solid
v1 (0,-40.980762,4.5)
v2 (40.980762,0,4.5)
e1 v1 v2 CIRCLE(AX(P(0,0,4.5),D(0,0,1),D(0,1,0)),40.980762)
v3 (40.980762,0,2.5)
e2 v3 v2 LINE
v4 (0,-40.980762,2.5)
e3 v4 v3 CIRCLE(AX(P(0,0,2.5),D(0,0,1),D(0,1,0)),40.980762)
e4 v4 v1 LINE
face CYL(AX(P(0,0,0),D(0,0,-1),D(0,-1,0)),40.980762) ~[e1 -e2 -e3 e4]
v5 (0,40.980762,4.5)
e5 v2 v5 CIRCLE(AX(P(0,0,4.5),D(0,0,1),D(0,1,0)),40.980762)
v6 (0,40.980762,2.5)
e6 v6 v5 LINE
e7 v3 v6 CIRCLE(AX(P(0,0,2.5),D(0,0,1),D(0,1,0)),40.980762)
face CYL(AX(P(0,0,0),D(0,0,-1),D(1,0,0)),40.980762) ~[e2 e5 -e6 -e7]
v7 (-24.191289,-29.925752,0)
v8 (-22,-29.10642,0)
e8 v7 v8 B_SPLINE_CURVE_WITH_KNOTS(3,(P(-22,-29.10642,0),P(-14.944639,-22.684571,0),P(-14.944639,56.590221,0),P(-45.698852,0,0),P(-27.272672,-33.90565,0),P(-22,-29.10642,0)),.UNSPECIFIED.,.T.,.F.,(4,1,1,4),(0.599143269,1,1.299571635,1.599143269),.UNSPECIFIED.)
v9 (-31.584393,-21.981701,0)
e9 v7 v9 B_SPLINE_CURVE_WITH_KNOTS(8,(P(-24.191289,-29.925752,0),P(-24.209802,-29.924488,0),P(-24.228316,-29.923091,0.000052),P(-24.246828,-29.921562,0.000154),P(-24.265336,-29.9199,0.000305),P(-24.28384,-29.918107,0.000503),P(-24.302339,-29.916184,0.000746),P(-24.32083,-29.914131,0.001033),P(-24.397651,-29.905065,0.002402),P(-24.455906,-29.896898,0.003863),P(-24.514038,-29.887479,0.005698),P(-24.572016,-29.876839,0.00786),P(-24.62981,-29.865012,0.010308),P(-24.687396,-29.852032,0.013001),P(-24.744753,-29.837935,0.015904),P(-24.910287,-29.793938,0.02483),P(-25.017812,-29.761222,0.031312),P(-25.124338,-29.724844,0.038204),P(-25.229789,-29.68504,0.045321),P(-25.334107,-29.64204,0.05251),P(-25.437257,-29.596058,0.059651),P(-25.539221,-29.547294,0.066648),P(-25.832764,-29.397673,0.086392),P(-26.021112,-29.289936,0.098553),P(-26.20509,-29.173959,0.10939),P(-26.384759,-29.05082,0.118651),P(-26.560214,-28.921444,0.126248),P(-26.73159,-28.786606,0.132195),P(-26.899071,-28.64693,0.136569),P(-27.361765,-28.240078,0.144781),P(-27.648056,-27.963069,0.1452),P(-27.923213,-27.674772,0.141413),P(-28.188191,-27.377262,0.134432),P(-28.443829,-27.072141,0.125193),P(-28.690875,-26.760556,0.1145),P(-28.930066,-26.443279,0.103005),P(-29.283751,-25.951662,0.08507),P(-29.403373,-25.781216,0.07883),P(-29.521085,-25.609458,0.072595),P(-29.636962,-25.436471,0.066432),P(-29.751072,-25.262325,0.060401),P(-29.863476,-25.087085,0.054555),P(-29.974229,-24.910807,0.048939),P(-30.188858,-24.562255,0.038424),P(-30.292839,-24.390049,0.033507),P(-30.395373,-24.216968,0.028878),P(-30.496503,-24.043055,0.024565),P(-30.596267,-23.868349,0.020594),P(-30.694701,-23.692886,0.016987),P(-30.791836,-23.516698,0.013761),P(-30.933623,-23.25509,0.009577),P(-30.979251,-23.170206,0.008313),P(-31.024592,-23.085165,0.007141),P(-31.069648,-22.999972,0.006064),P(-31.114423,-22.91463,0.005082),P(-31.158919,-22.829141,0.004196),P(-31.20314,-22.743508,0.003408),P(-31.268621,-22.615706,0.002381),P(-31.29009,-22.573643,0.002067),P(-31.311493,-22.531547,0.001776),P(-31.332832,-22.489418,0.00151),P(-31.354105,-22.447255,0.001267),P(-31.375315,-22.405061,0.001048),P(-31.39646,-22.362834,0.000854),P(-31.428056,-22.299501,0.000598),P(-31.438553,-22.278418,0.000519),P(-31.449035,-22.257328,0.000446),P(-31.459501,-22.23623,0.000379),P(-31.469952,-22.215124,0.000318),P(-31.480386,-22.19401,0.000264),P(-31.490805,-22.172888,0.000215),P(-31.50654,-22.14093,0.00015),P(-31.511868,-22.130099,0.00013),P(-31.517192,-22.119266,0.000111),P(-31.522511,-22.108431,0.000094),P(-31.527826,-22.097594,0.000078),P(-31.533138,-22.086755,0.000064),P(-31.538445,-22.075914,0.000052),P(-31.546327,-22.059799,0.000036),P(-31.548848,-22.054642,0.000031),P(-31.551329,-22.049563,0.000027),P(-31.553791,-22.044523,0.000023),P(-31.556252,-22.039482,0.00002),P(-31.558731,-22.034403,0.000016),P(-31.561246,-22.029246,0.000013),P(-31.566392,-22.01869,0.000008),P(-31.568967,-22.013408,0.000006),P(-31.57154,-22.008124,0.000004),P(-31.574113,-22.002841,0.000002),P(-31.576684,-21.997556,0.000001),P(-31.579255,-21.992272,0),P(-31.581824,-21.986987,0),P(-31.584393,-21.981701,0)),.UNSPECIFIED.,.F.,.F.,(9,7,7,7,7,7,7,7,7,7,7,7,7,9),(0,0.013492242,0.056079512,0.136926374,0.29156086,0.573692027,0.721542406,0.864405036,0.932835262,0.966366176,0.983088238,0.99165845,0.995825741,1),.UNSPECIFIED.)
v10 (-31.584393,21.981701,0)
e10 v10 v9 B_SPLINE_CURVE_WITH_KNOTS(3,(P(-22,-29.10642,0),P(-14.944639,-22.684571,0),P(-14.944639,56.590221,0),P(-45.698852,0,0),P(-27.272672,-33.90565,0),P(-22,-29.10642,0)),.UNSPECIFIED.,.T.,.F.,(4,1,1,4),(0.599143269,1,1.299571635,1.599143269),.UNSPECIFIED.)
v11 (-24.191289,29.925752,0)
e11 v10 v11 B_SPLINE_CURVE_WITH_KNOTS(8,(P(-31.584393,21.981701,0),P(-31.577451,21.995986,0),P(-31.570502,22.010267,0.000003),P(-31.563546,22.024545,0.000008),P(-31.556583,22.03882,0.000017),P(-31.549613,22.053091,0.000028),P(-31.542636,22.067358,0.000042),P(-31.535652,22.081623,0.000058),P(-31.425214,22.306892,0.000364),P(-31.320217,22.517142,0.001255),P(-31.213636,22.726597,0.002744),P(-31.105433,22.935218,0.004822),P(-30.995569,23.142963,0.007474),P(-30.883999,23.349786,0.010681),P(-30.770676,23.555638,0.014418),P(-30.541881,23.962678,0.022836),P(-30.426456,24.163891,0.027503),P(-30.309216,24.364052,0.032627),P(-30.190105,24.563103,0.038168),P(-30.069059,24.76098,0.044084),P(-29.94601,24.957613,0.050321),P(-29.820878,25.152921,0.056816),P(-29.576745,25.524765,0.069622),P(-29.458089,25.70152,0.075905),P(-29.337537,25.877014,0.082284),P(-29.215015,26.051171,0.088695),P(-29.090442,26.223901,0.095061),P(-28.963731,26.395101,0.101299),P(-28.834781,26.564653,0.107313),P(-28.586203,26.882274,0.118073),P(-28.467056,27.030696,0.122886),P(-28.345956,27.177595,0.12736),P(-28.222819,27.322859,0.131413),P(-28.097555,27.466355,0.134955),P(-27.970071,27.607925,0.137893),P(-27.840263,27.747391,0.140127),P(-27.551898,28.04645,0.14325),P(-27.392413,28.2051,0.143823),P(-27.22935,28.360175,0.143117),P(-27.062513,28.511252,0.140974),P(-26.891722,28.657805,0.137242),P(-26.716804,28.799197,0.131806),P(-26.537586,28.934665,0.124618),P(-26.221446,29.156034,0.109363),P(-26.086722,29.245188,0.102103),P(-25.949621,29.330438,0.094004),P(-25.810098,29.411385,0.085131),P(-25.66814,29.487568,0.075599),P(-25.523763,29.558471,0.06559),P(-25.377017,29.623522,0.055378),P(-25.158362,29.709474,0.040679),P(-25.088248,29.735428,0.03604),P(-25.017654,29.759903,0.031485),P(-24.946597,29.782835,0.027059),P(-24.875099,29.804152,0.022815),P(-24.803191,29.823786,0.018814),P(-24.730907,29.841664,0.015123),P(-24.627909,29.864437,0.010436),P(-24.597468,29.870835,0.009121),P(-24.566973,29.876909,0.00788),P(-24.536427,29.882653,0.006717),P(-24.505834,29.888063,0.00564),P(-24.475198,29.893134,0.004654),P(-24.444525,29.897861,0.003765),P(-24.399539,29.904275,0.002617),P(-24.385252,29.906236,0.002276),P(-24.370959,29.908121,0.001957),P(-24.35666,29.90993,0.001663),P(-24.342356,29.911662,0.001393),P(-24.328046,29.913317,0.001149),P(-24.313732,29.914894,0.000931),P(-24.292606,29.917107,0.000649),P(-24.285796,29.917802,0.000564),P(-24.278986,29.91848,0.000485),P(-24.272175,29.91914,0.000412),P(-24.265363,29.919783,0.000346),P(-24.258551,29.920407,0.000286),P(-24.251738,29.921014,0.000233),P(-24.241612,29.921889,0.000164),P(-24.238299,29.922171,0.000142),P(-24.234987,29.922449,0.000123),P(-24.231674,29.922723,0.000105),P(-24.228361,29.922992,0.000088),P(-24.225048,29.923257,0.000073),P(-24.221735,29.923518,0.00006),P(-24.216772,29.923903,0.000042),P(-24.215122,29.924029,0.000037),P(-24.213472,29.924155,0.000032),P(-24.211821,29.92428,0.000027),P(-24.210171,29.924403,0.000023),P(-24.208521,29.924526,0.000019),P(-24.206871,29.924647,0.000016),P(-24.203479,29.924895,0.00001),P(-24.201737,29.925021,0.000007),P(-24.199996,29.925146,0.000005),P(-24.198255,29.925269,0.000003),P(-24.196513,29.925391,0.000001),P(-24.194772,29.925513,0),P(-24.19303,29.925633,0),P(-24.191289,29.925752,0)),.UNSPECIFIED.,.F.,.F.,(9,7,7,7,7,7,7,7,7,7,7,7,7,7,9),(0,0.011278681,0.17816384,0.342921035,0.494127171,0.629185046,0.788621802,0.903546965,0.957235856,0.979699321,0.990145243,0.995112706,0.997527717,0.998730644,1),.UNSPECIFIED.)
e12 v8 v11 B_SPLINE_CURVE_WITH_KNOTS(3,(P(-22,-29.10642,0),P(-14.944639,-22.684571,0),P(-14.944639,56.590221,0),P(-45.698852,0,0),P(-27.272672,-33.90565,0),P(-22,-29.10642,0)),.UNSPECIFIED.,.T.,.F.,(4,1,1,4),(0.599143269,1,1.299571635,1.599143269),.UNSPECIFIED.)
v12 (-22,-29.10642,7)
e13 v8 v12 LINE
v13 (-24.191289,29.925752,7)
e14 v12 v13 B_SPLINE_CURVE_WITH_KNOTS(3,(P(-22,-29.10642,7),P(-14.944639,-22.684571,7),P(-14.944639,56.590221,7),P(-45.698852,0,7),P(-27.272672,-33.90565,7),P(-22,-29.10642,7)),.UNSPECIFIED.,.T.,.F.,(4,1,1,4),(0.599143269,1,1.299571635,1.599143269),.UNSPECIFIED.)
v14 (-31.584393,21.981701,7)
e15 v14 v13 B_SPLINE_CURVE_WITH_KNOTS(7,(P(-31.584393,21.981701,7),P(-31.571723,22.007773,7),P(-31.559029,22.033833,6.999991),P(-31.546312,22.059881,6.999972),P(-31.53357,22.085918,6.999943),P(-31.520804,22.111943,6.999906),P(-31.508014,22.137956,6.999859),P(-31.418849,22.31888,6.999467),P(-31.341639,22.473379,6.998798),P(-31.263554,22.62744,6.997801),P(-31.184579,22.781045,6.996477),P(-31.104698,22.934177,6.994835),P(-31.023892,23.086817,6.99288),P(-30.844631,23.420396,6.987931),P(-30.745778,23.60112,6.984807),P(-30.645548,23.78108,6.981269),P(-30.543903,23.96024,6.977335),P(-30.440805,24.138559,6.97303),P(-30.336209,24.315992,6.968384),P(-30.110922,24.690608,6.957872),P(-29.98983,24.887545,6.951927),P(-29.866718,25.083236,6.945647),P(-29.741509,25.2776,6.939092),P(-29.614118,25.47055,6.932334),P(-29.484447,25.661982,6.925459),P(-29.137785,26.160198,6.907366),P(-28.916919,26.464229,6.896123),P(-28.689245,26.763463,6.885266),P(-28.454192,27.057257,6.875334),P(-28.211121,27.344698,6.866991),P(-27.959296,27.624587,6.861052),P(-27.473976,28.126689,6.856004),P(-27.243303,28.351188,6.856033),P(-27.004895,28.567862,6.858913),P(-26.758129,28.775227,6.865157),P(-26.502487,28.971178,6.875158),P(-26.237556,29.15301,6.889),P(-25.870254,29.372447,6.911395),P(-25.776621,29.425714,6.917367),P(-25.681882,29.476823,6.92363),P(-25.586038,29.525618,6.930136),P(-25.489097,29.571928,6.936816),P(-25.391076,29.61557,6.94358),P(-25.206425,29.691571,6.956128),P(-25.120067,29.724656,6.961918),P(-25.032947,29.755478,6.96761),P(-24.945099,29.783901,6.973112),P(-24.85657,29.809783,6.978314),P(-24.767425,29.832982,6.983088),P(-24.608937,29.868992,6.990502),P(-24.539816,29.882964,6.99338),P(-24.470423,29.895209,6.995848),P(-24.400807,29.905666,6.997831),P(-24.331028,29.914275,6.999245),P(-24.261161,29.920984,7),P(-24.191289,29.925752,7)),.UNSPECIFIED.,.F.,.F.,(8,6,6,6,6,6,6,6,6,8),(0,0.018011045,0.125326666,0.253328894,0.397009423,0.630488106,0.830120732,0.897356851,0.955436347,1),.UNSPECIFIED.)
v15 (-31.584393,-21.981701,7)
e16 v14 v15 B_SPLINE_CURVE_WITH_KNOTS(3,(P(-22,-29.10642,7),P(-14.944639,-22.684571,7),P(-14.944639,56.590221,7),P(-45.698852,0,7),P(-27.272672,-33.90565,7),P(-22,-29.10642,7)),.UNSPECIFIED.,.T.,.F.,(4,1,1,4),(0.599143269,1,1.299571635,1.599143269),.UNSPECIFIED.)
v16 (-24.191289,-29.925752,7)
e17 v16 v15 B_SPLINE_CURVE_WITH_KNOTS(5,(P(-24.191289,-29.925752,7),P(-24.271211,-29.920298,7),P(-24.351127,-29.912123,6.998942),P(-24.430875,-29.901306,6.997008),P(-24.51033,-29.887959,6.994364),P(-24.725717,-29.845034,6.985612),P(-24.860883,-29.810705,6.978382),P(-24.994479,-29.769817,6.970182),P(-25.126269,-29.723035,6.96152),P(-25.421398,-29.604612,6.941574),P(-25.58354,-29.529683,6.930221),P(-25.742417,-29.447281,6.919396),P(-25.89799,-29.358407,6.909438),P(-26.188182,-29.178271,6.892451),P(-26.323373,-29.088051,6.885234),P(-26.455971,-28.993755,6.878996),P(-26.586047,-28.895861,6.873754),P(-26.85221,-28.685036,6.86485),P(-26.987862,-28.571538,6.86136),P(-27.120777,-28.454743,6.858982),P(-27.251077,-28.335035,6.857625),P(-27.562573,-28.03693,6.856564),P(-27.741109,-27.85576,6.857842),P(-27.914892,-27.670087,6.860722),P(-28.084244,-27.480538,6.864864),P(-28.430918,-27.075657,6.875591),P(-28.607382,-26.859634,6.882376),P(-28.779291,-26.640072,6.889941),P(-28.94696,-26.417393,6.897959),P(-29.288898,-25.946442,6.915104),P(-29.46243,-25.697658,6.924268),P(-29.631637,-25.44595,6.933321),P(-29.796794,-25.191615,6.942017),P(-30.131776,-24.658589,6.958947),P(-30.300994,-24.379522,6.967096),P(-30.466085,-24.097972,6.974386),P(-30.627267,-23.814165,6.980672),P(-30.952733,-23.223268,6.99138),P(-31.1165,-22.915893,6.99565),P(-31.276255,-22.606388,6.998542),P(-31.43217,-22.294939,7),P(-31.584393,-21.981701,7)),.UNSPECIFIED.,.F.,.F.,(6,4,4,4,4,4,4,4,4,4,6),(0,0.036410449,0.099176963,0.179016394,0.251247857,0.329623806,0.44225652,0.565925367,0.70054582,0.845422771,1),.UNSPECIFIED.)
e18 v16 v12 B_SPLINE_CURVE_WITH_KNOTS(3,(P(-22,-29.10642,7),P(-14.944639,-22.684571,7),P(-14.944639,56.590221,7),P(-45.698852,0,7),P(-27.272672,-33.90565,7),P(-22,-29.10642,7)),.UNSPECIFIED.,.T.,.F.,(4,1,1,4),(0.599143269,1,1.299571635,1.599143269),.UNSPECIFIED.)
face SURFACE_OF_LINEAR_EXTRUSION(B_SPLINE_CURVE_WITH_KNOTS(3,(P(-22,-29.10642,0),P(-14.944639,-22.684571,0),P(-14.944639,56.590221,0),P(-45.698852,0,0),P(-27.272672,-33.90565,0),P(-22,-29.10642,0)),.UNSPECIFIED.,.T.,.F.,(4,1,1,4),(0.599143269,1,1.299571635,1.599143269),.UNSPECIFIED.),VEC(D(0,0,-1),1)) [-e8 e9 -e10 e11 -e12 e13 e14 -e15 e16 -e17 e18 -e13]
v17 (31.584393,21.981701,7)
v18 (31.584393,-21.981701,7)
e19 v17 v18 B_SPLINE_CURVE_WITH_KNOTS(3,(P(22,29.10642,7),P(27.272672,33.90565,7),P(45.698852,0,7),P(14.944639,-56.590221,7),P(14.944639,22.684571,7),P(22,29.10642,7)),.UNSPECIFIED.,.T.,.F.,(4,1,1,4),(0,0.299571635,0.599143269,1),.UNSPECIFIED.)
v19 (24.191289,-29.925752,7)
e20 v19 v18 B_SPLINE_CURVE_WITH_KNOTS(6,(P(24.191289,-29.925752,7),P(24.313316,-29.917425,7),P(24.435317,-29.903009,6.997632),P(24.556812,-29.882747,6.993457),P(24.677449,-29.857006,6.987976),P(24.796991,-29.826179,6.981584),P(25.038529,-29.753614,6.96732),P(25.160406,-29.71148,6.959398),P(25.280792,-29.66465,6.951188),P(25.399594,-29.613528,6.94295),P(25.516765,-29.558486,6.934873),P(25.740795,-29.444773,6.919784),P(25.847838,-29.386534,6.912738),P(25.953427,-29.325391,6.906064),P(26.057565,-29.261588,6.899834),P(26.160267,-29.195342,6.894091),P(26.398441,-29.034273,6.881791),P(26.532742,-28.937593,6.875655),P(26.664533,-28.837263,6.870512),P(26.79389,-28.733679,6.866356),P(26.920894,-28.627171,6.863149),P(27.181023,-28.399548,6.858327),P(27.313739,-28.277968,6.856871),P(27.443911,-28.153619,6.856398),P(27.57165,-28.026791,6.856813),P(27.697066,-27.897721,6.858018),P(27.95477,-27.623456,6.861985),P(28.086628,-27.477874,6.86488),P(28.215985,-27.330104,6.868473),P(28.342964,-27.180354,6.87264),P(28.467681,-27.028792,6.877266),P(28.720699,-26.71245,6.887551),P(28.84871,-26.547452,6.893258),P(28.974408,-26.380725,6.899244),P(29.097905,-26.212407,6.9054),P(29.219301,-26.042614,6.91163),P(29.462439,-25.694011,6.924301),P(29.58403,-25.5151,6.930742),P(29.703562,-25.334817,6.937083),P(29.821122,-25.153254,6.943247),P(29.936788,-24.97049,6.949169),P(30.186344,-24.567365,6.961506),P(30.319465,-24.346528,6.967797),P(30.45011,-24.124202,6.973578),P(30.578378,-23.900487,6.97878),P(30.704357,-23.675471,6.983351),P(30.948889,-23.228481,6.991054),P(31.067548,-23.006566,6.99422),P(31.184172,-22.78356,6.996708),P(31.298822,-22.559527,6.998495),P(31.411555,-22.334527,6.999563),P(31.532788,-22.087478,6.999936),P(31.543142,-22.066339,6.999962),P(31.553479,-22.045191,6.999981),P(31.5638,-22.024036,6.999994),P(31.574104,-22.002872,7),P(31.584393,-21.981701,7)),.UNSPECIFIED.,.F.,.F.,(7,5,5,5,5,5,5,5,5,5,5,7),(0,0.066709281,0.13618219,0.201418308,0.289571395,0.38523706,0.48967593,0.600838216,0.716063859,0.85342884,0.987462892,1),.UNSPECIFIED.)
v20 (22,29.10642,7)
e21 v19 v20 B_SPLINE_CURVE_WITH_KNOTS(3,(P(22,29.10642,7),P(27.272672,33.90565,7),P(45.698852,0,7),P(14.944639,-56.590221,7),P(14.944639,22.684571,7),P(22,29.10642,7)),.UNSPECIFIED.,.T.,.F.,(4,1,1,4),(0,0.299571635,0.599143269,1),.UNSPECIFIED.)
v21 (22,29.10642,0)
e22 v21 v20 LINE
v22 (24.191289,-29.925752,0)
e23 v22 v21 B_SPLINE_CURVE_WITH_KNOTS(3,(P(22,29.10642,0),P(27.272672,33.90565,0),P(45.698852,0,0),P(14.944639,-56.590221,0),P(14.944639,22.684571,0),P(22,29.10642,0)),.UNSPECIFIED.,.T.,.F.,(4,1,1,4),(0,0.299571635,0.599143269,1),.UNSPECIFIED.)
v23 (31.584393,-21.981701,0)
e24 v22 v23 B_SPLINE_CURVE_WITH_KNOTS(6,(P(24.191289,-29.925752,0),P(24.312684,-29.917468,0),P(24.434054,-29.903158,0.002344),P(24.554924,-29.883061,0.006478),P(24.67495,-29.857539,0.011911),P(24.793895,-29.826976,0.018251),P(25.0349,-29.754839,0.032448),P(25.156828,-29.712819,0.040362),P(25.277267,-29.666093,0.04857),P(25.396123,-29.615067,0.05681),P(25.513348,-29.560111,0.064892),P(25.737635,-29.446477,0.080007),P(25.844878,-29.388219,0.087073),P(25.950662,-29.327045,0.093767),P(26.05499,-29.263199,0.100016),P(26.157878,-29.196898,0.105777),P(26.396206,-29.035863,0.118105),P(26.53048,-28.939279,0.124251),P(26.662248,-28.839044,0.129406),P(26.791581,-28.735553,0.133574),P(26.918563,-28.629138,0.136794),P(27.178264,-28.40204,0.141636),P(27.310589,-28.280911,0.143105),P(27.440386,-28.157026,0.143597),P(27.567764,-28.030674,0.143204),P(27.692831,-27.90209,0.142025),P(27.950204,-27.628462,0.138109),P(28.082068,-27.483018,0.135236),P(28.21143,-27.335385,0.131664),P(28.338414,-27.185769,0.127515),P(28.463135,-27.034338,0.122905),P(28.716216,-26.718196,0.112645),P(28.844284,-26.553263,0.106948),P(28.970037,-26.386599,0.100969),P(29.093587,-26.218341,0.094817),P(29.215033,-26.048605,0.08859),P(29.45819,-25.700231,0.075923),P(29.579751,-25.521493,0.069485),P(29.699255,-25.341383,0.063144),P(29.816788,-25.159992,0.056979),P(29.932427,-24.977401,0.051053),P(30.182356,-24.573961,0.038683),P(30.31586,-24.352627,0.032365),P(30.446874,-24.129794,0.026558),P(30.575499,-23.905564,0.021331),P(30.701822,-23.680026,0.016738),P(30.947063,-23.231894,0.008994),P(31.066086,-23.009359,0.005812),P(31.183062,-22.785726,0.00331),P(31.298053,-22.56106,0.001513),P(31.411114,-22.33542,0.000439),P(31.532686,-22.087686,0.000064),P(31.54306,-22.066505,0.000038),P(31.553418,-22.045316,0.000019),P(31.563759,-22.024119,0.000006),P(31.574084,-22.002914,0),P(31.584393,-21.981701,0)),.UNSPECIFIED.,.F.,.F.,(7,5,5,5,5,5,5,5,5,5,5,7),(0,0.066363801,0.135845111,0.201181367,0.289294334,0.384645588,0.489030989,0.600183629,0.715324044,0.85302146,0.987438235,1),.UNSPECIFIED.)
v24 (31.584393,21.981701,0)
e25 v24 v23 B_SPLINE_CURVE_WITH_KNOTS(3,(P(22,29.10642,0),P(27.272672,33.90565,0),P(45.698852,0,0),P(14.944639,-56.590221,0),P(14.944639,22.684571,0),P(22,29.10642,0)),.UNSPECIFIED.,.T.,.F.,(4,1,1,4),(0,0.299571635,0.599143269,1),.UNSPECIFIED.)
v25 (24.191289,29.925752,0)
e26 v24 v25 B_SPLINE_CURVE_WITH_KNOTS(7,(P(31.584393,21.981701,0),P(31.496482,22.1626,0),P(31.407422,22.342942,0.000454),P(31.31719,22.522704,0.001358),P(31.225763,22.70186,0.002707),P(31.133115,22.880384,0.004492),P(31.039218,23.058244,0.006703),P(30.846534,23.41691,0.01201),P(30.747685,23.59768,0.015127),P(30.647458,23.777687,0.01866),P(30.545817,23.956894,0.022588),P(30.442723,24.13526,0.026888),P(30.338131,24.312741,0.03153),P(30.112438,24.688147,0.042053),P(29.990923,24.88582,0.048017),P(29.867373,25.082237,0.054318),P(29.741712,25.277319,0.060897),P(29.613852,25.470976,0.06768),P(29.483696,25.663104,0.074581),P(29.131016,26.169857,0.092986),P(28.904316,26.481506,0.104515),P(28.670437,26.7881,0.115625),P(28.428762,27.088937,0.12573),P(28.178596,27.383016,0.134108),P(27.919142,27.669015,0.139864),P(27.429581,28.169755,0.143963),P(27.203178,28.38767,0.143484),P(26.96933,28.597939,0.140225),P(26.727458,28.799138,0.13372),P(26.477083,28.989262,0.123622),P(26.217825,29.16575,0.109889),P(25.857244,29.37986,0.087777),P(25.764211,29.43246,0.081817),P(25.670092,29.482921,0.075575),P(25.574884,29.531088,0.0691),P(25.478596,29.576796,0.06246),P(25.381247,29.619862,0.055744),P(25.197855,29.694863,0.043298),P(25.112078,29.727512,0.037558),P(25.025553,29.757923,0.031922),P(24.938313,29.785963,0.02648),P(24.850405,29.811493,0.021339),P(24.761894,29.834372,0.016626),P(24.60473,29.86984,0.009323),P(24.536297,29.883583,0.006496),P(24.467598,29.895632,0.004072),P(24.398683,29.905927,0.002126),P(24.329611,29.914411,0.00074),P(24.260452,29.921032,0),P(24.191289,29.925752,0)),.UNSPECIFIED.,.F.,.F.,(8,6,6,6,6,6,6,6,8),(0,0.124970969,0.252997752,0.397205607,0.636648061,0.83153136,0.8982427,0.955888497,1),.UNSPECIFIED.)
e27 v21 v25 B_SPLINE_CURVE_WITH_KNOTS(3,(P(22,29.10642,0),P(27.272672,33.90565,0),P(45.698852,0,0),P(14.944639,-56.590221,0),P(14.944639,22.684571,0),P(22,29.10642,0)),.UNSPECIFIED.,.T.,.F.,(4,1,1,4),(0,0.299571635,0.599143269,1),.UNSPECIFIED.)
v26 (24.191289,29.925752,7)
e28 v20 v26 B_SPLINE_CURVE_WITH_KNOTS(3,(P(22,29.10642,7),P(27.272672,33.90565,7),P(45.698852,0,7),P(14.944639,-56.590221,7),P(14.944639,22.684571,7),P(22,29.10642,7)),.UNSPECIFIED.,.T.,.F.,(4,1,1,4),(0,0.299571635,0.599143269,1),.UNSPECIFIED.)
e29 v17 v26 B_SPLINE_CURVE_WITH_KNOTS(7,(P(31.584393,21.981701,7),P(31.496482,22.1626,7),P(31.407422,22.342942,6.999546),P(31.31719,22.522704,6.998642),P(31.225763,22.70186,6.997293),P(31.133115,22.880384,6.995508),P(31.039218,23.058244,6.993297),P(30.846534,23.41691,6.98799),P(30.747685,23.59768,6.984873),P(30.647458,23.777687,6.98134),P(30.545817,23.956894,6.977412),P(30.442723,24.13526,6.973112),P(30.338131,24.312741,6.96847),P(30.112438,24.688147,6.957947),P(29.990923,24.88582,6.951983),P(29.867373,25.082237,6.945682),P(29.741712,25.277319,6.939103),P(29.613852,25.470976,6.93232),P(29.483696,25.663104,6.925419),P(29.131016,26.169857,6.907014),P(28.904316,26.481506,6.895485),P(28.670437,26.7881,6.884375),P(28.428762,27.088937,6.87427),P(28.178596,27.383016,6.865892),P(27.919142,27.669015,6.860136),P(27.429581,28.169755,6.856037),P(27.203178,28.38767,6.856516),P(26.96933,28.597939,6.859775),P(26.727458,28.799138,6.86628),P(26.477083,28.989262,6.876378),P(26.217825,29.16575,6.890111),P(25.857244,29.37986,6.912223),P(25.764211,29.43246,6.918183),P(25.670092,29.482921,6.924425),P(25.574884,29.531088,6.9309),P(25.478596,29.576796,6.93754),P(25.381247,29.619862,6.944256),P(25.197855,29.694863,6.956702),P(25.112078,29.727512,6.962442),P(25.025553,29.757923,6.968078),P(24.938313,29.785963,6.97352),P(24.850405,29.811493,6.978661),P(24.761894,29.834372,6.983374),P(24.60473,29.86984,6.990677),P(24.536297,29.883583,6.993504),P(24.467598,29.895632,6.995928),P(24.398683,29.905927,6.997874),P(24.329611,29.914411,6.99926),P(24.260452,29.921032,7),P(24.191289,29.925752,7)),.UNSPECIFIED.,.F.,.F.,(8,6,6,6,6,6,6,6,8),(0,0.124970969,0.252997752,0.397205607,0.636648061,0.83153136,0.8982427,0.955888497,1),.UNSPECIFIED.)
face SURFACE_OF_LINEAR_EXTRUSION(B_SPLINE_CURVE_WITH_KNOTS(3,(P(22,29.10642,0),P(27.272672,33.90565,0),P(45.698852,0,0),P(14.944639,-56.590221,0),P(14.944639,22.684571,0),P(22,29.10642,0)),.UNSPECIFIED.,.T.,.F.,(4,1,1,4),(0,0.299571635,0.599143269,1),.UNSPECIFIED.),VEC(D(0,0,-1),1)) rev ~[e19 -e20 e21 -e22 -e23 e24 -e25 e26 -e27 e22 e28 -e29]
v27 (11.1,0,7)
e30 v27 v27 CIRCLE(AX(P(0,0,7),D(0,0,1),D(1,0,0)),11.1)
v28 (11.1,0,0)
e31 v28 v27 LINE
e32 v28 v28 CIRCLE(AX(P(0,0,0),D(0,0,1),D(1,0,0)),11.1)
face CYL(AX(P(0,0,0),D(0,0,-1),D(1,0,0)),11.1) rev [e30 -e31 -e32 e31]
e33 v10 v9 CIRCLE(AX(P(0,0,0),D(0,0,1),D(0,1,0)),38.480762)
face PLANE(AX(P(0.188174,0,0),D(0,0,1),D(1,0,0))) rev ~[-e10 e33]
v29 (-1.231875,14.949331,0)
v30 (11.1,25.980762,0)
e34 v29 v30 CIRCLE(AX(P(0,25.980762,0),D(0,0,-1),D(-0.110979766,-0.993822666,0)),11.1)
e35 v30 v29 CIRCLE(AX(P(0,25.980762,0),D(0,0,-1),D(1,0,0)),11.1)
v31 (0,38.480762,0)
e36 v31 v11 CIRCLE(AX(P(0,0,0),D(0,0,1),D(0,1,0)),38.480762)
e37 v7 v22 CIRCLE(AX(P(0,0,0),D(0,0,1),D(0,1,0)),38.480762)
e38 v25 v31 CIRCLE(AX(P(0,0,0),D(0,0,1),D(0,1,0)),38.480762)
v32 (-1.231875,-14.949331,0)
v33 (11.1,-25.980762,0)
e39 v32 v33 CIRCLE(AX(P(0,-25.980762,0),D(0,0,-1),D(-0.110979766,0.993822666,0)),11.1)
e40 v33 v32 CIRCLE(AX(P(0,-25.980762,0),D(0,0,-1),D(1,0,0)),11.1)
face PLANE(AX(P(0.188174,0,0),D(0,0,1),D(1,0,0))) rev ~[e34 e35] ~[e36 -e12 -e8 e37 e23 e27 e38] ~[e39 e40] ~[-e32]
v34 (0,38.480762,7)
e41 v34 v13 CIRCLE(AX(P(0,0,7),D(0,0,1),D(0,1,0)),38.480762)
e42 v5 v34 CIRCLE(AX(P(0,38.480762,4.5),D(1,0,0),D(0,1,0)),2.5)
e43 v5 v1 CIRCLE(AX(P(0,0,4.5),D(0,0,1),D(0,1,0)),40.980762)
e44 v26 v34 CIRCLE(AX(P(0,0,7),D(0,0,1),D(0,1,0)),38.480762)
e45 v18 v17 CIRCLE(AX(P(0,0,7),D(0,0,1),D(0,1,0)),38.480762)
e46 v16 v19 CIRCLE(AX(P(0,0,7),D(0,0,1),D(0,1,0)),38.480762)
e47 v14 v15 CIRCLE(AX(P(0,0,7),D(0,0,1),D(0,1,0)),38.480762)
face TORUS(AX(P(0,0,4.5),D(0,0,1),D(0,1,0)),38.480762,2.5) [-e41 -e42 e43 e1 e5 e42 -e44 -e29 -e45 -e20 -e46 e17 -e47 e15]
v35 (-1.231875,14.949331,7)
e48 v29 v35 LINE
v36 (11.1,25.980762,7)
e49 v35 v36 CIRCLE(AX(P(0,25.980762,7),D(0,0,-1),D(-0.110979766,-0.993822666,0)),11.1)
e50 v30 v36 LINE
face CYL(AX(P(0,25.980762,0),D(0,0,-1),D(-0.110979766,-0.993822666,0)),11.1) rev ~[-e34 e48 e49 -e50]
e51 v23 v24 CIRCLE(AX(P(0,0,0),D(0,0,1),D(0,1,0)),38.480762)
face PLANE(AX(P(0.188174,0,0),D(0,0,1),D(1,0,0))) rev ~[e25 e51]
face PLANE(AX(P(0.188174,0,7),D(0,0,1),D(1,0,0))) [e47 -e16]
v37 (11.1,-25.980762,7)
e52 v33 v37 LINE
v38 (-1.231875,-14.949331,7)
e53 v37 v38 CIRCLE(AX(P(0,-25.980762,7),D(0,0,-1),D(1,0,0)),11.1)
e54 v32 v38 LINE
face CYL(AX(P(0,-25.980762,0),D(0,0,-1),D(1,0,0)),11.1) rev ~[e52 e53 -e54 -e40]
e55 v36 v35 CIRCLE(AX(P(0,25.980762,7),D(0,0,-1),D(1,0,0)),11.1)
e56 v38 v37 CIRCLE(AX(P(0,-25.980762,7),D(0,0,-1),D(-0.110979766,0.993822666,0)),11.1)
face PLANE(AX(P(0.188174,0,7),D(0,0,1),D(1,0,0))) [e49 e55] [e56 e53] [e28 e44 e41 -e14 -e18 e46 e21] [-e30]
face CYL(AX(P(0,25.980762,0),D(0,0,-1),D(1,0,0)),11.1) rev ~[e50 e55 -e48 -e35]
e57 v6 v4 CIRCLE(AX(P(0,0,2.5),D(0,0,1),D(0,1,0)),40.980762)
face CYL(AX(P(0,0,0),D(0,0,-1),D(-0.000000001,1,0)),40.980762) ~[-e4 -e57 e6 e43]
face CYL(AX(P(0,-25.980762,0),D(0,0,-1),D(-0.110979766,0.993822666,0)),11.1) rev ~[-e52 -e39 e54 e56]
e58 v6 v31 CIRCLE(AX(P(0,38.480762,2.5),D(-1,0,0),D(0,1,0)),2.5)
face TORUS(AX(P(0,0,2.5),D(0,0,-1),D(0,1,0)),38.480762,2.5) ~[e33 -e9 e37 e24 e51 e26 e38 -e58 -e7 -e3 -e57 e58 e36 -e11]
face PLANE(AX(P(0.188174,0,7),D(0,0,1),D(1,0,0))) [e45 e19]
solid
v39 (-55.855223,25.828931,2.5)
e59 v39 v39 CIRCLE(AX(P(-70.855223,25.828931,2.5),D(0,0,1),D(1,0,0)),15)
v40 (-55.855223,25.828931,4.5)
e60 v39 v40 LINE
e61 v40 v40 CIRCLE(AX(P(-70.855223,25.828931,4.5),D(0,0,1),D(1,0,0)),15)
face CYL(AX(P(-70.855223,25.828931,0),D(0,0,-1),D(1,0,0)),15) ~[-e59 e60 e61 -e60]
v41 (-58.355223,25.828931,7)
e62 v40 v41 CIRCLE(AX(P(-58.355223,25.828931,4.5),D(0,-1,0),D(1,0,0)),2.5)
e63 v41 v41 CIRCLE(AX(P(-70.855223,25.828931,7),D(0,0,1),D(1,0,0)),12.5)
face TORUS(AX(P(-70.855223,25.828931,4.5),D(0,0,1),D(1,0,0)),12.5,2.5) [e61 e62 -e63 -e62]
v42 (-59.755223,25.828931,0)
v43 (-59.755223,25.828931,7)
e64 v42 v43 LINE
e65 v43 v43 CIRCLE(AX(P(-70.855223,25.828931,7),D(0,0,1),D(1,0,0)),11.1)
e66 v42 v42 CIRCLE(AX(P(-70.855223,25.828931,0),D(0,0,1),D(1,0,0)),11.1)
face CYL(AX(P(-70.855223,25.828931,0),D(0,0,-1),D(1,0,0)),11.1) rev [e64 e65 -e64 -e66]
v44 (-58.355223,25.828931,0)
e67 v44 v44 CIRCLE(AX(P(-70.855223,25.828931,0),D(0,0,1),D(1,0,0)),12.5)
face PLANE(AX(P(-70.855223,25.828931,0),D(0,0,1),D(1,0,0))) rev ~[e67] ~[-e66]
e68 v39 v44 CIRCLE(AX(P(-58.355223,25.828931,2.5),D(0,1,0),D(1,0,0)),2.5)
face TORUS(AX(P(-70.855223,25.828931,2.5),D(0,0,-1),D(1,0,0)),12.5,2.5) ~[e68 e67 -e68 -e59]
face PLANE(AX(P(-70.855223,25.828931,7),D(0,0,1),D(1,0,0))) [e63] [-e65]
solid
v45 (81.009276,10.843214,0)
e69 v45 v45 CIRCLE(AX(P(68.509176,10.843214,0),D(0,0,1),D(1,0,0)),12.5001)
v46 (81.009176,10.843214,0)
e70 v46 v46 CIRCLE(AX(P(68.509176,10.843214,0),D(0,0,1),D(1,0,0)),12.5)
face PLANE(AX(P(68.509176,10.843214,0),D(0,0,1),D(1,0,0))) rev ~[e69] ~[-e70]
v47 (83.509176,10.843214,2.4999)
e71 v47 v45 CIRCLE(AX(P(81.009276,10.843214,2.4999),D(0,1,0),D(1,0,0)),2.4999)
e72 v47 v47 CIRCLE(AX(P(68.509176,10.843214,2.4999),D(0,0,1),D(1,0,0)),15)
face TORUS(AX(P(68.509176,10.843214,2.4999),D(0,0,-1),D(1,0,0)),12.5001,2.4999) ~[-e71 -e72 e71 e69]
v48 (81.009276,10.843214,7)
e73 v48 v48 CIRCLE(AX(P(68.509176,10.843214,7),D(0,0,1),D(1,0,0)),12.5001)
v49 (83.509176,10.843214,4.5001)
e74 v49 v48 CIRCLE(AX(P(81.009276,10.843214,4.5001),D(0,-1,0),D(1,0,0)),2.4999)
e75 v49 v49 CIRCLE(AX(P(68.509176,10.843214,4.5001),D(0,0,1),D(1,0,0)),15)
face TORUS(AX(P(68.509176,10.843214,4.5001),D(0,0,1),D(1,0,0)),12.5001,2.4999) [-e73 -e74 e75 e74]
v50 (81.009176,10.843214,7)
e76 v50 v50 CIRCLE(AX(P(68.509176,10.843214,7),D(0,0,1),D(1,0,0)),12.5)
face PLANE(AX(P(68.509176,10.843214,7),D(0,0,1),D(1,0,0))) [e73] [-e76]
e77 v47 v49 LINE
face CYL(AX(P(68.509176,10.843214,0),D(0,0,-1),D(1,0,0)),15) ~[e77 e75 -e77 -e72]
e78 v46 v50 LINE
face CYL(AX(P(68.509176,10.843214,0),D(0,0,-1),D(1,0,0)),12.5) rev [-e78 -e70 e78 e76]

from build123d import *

# Parameters (mm, degrees)
F0_R      = 11.1
F1_DEPTH  = 7
F0_R_2    = 15
F0_R_3    = 12.5
F2_2_F1_R = 2.5
F2_2_F2_R = 2.5
F2_3_F1_R = 2.4999
F2_3_F2_R = 2.4999


# Not quite as in the source:
# - a fillet or chamfer that OpenCascade refuses, or shapes differently, is made with other operations: its cross-section is extruded or revolved along the edge and cut away or added
# - a fillet or chamfer is up to 0.001 mm smaller than in the source, because OpenCascade refuses the exact size
# - a feature names something its author has since deleted; it is built from what else it names


with BuildPart() as f1:
    # F0 (on Top) → F1 (new body)
    with BuildSketch(Plane.XY):
        with BuildLine():
            ThreePointArc((7.5, -12.9903810568), (12.9903810568, -7.5), (15, 0))
            ThreePointArc((15, 0), (12.9903810568, 7.5), (7.5, 12.9903810568))
            ThreePointArc((7.5, 12.9903810568), (4.4744589336, 14.3170952798), (1.2318753995, 14.9493305201))
            ThreePointArc((1.2318753995, 14.9493305201), (0, 14.8807621135), (-1.2318753995, 14.9493305201))
            ThreePointArc((-1.2318753995, 14.9493305201), (-4.4744589336, 14.3170952798), (-7.5, 12.9903810568))
            ThreePointArc((-7.5, 12.9903810568), (-15, 0), (-7.5, -12.9903810568))
            ThreePointArc((-7.5, -12.9903810568), (-4.4744589336, -14.3170952798), (-1.2318753995, -14.9493305201))
            ThreePointArc((-1.2318753995, -14.9493305201), (0, -14.8807621135), (1.2318753995, -14.9493305201))
            ThreePointArc((1.2318753995, -14.9493305201), (4.4744589336, -14.3170952798), (7.5, -12.9903810568))
        make_face()
        Circle(F0_R, mode=Mode.SUBTRACT)
        with BuildLine():
            ThreePointArc((7.5, 12.9903810568), (12.9903810568, 7.5), (15, 0))
            ThreePointArc((15, 0), (12.9903810568, -7.5), (7.5, -12.9903810568))
            ThreePointArc((7.5, -12.9903810568), (14.4888873943, -29.8630477901), (0, -40.9807621135))
            ThreePointArc((0, -40.9807621135), (28.9777747887, -28.9777747887), (40.9807621135, 0))
            ThreePointArc((40.9807621135, 0), (28.9777747809, 28.9777747965), (-2.21e-08, 40.9807621135))
            ThreePointArc((-2.21e-08, 40.9807621135), (14.4888873915, 29.8630478007), (7.5, 12.9903810568))
        make_face()
        with BuildLine():
            add(Edge.make_bspline(
                [(22, -29.1064200265), (14.9446387059, -22.6845711722), (14.9446387059, 22.6845711722), (22, 29.1064200265)],
                knots=[0.5991432693, 0.5991432693, 0.5991432693, 0.5991432693, 1, 1, 1, 1], degree=3))
            add(Edge.make_bspline(
                [(22, 29.1064200265), (27.2726721388, 33.9056503029), (45.6988520883, 0), (27.2726721388, -33.9056503029), (22, -29.1064200265)],
                knots=[0, 0, 0, 0, 0.2995716346, 0.5991432693, 0.5991432693, 0.5991432693, 0.5991432693], degree=3))
        make_face(mode=Mode.SUBTRACT)
        with BuildLine():
            ThreePointArc((1.2318753995, 14.9493305201), (4.4744589336, 14.3170952798), (7.5, 12.9903810568))
            ThreePointArc((7.5, 12.9903810568), (14.4888873915, 29.8630478007), (-2.21e-08, 40.9807621135))
            ThreePointArc((-2.21e-08, 40.9807621135), (-14.4888873972, 29.8630477794), (-7.5, 12.9903810568))
            ThreePointArc((-7.5, 12.9903810568), (-4.4744589336, 14.3170952798), (-1.2318753995, 14.9493305201))
            ThreePointArc((-1.2318753995, 14.9493305201), (-7.400546705, 34.25372461), (11.1, 25.9807621135))
            ThreePointArc((11.1, 25.9807621135), (8.2729624964, 18.5802154086), (1.2318753995, 14.9493305201))
        make_face()
        with BuildLine():
            ThreePointArc((0, -40.9807621135), (14.4888873943, -29.8630477901), (7.5, -12.9903810568))
            ThreePointArc((7.5, -12.9903810568), (4.4744589336, -14.3170952798), (1.2318753995, -14.9493305201))
            ThreePointArc((1.2318753995, -14.9493305201), (8.2729624964, -18.5802154086), (11.1, -25.9807621135))
            ThreePointArc((11.1, -25.9807621135), (-7.400546705, -34.25372461), (-1.2318753995, -14.9493305201))
            ThreePointArc((-1.2318753995, -14.9493305201), (-4.4744589336, -14.3170952798), (-7.5, -12.9903810568))
            ThreePointArc((-7.5, -12.9903810568), (-14.4888873943, -29.8630477901), (0, -40.9807621135))
        make_face()
        with BuildLine():
            ThreePointArc((-7.5, 12.9903810568), (-14.4888873972, 29.8630477794), (-2.21e-08, 40.9807621135))
            ThreePointArc((-2.21e-08, 40.9807621135), (-40.9807621135, -1.11e-08), (0, -40.9807621135))
            ThreePointArc((0, -40.9807621135), (-14.4888873943, -29.8630477901), (-7.5, -12.9903810568))
            ThreePointArc((-7.5, -12.9903810568), (-15, 0), (-7.5, 12.9903810568))
        make_face()
        with BuildLine():
            add(Edge.make_bspline(
                [(-22, 29.1064200265), (-27.2726721388, 33.9056503029), (-45.6988520883, 0), (-27.2726721388, -33.9056503029), (-22, -29.1064200265)],
                knots=[0, 0, 0, 0, 0.2995716346, 0.5991432693, 0.5991432693, 0.5991432693, 0.5991432693], degree=3))
            add(Edge.make_bspline(
                [(-22, -29.1064200265), (-14.9446387059, -22.6845711722), (-14.9446387059, 22.6845711722), (-22, 29.1064200265)],
                knots=[0.5991432693, 0.5991432693, 0.5991432693, 0.5991432693, 1, 1, 1, 1], degree=3))
        make_face(mode=Mode.SUBTRACT)
    extrude(amount=F1_DEPTH)

    # F2: fillet of radius 2.5 on 2 edges, made by hand

    # F2_s1 → F2_t2 (revolve, cut)
    with BuildSketch(Plane.YZ):
        with BuildLine():
            ThreePointArc((40.9807621135, 4.5), (40.2485290665, 6.267766953), (38.4807621135, 7))
            Line((38.4807621135, 7), (40.9807621135, 7))
            Line((40.9807621135, 7), (40.9807621135, 4.5))
        make_face()
    revolve(axis=Axis((0, 0, 7), (0, 0, 1)), mode=Mode.SUBTRACT)

    # F2_s3 → F2_t4 (revolve, cut)
    with BuildSketch(Plane.YZ):
        with BuildLine():
            ThreePointArc((40.9807621135, 2.5), (40.2485290665, 0.732233047), (38.4807621135, 0))
            Line((38.4807621135, 0), (40.9807621135, 0))
            Line((40.9807621135, 0), (40.9807621135, 2.5))
        make_face()
    revolve(axis=Axis((0, 0, 0), (0, 0, 1)), mode=Mode.SUBTRACT)


with BuildPart() as f1b:
    # F0 (on Top) → F1, piece 2 (new body)
    with BuildSketch(Plane.XY):
        with Locations((-70.8552226424, 25.8289314806)):
            Circle(F0_R_2)
        with Locations((-70.8552226424, 25.8289314806)):
            Circle(F0_R, mode=Mode.SUBTRACT)
    extrude(amount=F1_DEPTH)

    # F2#2: fillet of radius 2.5 on 2 edges, made by hand

    # F2_2_f1
    f2_2_f1_edges = [f1b.edges().sort_by_distance(p)[0] for p in [
        (-85.8552226424, 25.8289314806, 0),
    ]]
    fillet(f2_2_f1_edges, radius=F2_2_F1_R)

    # F2_2_f2
    f2_2_f2_edges = [f1b.edges().sort_by_distance(p)[0] for p in [
        (-85.8552226424, 25.8289314806, 7),
    ]]
    fillet(f2_2_f2_edges, radius=F2_2_F2_R)


with BuildPart() as f1c:
    # F0 (on Top) → F1, piece 3 (new body)
    with BuildSketch(Plane.XY):
        with Locations((68.5091763735, 10.8432136476)):
            Circle(F0_R_2)
        with Locations((68.5091763735, 10.8432136476)):
            Circle(F0_R_3, mode=Mode.SUBTRACT)
    extrude(amount=F1_DEPTH)

    # F2#3: fillet of radius 2.5 on 2 edges, made by hand

    # F2_3_f1 (radius 2.5 in the source; OpenCascade refuses exactly that, so slightly less here)
    f2_3_f1_edges = [f1c.edges().sort_by_distance(p)[0] for p in [
        (53.5091763735, 10.8432136476, 0),
    ]]
    fillet(f2_3_f1_edges, radius=F2_3_F1_R)

    # F2_3_f2 (radius 2.5 in the source; OpenCascade refuses exactly that, so slightly less here)
    f2_3_f2_edges = [f1c.edges().sort_by_distance(p)[0] for p in [
        (53.5091763735, 10.8432136476, 7),
    ]]
    fillet(f2_3_f2_edges, radius=F2_3_F2_R)


solid = Compound([f1.part, f1b.part, f1c.part])
